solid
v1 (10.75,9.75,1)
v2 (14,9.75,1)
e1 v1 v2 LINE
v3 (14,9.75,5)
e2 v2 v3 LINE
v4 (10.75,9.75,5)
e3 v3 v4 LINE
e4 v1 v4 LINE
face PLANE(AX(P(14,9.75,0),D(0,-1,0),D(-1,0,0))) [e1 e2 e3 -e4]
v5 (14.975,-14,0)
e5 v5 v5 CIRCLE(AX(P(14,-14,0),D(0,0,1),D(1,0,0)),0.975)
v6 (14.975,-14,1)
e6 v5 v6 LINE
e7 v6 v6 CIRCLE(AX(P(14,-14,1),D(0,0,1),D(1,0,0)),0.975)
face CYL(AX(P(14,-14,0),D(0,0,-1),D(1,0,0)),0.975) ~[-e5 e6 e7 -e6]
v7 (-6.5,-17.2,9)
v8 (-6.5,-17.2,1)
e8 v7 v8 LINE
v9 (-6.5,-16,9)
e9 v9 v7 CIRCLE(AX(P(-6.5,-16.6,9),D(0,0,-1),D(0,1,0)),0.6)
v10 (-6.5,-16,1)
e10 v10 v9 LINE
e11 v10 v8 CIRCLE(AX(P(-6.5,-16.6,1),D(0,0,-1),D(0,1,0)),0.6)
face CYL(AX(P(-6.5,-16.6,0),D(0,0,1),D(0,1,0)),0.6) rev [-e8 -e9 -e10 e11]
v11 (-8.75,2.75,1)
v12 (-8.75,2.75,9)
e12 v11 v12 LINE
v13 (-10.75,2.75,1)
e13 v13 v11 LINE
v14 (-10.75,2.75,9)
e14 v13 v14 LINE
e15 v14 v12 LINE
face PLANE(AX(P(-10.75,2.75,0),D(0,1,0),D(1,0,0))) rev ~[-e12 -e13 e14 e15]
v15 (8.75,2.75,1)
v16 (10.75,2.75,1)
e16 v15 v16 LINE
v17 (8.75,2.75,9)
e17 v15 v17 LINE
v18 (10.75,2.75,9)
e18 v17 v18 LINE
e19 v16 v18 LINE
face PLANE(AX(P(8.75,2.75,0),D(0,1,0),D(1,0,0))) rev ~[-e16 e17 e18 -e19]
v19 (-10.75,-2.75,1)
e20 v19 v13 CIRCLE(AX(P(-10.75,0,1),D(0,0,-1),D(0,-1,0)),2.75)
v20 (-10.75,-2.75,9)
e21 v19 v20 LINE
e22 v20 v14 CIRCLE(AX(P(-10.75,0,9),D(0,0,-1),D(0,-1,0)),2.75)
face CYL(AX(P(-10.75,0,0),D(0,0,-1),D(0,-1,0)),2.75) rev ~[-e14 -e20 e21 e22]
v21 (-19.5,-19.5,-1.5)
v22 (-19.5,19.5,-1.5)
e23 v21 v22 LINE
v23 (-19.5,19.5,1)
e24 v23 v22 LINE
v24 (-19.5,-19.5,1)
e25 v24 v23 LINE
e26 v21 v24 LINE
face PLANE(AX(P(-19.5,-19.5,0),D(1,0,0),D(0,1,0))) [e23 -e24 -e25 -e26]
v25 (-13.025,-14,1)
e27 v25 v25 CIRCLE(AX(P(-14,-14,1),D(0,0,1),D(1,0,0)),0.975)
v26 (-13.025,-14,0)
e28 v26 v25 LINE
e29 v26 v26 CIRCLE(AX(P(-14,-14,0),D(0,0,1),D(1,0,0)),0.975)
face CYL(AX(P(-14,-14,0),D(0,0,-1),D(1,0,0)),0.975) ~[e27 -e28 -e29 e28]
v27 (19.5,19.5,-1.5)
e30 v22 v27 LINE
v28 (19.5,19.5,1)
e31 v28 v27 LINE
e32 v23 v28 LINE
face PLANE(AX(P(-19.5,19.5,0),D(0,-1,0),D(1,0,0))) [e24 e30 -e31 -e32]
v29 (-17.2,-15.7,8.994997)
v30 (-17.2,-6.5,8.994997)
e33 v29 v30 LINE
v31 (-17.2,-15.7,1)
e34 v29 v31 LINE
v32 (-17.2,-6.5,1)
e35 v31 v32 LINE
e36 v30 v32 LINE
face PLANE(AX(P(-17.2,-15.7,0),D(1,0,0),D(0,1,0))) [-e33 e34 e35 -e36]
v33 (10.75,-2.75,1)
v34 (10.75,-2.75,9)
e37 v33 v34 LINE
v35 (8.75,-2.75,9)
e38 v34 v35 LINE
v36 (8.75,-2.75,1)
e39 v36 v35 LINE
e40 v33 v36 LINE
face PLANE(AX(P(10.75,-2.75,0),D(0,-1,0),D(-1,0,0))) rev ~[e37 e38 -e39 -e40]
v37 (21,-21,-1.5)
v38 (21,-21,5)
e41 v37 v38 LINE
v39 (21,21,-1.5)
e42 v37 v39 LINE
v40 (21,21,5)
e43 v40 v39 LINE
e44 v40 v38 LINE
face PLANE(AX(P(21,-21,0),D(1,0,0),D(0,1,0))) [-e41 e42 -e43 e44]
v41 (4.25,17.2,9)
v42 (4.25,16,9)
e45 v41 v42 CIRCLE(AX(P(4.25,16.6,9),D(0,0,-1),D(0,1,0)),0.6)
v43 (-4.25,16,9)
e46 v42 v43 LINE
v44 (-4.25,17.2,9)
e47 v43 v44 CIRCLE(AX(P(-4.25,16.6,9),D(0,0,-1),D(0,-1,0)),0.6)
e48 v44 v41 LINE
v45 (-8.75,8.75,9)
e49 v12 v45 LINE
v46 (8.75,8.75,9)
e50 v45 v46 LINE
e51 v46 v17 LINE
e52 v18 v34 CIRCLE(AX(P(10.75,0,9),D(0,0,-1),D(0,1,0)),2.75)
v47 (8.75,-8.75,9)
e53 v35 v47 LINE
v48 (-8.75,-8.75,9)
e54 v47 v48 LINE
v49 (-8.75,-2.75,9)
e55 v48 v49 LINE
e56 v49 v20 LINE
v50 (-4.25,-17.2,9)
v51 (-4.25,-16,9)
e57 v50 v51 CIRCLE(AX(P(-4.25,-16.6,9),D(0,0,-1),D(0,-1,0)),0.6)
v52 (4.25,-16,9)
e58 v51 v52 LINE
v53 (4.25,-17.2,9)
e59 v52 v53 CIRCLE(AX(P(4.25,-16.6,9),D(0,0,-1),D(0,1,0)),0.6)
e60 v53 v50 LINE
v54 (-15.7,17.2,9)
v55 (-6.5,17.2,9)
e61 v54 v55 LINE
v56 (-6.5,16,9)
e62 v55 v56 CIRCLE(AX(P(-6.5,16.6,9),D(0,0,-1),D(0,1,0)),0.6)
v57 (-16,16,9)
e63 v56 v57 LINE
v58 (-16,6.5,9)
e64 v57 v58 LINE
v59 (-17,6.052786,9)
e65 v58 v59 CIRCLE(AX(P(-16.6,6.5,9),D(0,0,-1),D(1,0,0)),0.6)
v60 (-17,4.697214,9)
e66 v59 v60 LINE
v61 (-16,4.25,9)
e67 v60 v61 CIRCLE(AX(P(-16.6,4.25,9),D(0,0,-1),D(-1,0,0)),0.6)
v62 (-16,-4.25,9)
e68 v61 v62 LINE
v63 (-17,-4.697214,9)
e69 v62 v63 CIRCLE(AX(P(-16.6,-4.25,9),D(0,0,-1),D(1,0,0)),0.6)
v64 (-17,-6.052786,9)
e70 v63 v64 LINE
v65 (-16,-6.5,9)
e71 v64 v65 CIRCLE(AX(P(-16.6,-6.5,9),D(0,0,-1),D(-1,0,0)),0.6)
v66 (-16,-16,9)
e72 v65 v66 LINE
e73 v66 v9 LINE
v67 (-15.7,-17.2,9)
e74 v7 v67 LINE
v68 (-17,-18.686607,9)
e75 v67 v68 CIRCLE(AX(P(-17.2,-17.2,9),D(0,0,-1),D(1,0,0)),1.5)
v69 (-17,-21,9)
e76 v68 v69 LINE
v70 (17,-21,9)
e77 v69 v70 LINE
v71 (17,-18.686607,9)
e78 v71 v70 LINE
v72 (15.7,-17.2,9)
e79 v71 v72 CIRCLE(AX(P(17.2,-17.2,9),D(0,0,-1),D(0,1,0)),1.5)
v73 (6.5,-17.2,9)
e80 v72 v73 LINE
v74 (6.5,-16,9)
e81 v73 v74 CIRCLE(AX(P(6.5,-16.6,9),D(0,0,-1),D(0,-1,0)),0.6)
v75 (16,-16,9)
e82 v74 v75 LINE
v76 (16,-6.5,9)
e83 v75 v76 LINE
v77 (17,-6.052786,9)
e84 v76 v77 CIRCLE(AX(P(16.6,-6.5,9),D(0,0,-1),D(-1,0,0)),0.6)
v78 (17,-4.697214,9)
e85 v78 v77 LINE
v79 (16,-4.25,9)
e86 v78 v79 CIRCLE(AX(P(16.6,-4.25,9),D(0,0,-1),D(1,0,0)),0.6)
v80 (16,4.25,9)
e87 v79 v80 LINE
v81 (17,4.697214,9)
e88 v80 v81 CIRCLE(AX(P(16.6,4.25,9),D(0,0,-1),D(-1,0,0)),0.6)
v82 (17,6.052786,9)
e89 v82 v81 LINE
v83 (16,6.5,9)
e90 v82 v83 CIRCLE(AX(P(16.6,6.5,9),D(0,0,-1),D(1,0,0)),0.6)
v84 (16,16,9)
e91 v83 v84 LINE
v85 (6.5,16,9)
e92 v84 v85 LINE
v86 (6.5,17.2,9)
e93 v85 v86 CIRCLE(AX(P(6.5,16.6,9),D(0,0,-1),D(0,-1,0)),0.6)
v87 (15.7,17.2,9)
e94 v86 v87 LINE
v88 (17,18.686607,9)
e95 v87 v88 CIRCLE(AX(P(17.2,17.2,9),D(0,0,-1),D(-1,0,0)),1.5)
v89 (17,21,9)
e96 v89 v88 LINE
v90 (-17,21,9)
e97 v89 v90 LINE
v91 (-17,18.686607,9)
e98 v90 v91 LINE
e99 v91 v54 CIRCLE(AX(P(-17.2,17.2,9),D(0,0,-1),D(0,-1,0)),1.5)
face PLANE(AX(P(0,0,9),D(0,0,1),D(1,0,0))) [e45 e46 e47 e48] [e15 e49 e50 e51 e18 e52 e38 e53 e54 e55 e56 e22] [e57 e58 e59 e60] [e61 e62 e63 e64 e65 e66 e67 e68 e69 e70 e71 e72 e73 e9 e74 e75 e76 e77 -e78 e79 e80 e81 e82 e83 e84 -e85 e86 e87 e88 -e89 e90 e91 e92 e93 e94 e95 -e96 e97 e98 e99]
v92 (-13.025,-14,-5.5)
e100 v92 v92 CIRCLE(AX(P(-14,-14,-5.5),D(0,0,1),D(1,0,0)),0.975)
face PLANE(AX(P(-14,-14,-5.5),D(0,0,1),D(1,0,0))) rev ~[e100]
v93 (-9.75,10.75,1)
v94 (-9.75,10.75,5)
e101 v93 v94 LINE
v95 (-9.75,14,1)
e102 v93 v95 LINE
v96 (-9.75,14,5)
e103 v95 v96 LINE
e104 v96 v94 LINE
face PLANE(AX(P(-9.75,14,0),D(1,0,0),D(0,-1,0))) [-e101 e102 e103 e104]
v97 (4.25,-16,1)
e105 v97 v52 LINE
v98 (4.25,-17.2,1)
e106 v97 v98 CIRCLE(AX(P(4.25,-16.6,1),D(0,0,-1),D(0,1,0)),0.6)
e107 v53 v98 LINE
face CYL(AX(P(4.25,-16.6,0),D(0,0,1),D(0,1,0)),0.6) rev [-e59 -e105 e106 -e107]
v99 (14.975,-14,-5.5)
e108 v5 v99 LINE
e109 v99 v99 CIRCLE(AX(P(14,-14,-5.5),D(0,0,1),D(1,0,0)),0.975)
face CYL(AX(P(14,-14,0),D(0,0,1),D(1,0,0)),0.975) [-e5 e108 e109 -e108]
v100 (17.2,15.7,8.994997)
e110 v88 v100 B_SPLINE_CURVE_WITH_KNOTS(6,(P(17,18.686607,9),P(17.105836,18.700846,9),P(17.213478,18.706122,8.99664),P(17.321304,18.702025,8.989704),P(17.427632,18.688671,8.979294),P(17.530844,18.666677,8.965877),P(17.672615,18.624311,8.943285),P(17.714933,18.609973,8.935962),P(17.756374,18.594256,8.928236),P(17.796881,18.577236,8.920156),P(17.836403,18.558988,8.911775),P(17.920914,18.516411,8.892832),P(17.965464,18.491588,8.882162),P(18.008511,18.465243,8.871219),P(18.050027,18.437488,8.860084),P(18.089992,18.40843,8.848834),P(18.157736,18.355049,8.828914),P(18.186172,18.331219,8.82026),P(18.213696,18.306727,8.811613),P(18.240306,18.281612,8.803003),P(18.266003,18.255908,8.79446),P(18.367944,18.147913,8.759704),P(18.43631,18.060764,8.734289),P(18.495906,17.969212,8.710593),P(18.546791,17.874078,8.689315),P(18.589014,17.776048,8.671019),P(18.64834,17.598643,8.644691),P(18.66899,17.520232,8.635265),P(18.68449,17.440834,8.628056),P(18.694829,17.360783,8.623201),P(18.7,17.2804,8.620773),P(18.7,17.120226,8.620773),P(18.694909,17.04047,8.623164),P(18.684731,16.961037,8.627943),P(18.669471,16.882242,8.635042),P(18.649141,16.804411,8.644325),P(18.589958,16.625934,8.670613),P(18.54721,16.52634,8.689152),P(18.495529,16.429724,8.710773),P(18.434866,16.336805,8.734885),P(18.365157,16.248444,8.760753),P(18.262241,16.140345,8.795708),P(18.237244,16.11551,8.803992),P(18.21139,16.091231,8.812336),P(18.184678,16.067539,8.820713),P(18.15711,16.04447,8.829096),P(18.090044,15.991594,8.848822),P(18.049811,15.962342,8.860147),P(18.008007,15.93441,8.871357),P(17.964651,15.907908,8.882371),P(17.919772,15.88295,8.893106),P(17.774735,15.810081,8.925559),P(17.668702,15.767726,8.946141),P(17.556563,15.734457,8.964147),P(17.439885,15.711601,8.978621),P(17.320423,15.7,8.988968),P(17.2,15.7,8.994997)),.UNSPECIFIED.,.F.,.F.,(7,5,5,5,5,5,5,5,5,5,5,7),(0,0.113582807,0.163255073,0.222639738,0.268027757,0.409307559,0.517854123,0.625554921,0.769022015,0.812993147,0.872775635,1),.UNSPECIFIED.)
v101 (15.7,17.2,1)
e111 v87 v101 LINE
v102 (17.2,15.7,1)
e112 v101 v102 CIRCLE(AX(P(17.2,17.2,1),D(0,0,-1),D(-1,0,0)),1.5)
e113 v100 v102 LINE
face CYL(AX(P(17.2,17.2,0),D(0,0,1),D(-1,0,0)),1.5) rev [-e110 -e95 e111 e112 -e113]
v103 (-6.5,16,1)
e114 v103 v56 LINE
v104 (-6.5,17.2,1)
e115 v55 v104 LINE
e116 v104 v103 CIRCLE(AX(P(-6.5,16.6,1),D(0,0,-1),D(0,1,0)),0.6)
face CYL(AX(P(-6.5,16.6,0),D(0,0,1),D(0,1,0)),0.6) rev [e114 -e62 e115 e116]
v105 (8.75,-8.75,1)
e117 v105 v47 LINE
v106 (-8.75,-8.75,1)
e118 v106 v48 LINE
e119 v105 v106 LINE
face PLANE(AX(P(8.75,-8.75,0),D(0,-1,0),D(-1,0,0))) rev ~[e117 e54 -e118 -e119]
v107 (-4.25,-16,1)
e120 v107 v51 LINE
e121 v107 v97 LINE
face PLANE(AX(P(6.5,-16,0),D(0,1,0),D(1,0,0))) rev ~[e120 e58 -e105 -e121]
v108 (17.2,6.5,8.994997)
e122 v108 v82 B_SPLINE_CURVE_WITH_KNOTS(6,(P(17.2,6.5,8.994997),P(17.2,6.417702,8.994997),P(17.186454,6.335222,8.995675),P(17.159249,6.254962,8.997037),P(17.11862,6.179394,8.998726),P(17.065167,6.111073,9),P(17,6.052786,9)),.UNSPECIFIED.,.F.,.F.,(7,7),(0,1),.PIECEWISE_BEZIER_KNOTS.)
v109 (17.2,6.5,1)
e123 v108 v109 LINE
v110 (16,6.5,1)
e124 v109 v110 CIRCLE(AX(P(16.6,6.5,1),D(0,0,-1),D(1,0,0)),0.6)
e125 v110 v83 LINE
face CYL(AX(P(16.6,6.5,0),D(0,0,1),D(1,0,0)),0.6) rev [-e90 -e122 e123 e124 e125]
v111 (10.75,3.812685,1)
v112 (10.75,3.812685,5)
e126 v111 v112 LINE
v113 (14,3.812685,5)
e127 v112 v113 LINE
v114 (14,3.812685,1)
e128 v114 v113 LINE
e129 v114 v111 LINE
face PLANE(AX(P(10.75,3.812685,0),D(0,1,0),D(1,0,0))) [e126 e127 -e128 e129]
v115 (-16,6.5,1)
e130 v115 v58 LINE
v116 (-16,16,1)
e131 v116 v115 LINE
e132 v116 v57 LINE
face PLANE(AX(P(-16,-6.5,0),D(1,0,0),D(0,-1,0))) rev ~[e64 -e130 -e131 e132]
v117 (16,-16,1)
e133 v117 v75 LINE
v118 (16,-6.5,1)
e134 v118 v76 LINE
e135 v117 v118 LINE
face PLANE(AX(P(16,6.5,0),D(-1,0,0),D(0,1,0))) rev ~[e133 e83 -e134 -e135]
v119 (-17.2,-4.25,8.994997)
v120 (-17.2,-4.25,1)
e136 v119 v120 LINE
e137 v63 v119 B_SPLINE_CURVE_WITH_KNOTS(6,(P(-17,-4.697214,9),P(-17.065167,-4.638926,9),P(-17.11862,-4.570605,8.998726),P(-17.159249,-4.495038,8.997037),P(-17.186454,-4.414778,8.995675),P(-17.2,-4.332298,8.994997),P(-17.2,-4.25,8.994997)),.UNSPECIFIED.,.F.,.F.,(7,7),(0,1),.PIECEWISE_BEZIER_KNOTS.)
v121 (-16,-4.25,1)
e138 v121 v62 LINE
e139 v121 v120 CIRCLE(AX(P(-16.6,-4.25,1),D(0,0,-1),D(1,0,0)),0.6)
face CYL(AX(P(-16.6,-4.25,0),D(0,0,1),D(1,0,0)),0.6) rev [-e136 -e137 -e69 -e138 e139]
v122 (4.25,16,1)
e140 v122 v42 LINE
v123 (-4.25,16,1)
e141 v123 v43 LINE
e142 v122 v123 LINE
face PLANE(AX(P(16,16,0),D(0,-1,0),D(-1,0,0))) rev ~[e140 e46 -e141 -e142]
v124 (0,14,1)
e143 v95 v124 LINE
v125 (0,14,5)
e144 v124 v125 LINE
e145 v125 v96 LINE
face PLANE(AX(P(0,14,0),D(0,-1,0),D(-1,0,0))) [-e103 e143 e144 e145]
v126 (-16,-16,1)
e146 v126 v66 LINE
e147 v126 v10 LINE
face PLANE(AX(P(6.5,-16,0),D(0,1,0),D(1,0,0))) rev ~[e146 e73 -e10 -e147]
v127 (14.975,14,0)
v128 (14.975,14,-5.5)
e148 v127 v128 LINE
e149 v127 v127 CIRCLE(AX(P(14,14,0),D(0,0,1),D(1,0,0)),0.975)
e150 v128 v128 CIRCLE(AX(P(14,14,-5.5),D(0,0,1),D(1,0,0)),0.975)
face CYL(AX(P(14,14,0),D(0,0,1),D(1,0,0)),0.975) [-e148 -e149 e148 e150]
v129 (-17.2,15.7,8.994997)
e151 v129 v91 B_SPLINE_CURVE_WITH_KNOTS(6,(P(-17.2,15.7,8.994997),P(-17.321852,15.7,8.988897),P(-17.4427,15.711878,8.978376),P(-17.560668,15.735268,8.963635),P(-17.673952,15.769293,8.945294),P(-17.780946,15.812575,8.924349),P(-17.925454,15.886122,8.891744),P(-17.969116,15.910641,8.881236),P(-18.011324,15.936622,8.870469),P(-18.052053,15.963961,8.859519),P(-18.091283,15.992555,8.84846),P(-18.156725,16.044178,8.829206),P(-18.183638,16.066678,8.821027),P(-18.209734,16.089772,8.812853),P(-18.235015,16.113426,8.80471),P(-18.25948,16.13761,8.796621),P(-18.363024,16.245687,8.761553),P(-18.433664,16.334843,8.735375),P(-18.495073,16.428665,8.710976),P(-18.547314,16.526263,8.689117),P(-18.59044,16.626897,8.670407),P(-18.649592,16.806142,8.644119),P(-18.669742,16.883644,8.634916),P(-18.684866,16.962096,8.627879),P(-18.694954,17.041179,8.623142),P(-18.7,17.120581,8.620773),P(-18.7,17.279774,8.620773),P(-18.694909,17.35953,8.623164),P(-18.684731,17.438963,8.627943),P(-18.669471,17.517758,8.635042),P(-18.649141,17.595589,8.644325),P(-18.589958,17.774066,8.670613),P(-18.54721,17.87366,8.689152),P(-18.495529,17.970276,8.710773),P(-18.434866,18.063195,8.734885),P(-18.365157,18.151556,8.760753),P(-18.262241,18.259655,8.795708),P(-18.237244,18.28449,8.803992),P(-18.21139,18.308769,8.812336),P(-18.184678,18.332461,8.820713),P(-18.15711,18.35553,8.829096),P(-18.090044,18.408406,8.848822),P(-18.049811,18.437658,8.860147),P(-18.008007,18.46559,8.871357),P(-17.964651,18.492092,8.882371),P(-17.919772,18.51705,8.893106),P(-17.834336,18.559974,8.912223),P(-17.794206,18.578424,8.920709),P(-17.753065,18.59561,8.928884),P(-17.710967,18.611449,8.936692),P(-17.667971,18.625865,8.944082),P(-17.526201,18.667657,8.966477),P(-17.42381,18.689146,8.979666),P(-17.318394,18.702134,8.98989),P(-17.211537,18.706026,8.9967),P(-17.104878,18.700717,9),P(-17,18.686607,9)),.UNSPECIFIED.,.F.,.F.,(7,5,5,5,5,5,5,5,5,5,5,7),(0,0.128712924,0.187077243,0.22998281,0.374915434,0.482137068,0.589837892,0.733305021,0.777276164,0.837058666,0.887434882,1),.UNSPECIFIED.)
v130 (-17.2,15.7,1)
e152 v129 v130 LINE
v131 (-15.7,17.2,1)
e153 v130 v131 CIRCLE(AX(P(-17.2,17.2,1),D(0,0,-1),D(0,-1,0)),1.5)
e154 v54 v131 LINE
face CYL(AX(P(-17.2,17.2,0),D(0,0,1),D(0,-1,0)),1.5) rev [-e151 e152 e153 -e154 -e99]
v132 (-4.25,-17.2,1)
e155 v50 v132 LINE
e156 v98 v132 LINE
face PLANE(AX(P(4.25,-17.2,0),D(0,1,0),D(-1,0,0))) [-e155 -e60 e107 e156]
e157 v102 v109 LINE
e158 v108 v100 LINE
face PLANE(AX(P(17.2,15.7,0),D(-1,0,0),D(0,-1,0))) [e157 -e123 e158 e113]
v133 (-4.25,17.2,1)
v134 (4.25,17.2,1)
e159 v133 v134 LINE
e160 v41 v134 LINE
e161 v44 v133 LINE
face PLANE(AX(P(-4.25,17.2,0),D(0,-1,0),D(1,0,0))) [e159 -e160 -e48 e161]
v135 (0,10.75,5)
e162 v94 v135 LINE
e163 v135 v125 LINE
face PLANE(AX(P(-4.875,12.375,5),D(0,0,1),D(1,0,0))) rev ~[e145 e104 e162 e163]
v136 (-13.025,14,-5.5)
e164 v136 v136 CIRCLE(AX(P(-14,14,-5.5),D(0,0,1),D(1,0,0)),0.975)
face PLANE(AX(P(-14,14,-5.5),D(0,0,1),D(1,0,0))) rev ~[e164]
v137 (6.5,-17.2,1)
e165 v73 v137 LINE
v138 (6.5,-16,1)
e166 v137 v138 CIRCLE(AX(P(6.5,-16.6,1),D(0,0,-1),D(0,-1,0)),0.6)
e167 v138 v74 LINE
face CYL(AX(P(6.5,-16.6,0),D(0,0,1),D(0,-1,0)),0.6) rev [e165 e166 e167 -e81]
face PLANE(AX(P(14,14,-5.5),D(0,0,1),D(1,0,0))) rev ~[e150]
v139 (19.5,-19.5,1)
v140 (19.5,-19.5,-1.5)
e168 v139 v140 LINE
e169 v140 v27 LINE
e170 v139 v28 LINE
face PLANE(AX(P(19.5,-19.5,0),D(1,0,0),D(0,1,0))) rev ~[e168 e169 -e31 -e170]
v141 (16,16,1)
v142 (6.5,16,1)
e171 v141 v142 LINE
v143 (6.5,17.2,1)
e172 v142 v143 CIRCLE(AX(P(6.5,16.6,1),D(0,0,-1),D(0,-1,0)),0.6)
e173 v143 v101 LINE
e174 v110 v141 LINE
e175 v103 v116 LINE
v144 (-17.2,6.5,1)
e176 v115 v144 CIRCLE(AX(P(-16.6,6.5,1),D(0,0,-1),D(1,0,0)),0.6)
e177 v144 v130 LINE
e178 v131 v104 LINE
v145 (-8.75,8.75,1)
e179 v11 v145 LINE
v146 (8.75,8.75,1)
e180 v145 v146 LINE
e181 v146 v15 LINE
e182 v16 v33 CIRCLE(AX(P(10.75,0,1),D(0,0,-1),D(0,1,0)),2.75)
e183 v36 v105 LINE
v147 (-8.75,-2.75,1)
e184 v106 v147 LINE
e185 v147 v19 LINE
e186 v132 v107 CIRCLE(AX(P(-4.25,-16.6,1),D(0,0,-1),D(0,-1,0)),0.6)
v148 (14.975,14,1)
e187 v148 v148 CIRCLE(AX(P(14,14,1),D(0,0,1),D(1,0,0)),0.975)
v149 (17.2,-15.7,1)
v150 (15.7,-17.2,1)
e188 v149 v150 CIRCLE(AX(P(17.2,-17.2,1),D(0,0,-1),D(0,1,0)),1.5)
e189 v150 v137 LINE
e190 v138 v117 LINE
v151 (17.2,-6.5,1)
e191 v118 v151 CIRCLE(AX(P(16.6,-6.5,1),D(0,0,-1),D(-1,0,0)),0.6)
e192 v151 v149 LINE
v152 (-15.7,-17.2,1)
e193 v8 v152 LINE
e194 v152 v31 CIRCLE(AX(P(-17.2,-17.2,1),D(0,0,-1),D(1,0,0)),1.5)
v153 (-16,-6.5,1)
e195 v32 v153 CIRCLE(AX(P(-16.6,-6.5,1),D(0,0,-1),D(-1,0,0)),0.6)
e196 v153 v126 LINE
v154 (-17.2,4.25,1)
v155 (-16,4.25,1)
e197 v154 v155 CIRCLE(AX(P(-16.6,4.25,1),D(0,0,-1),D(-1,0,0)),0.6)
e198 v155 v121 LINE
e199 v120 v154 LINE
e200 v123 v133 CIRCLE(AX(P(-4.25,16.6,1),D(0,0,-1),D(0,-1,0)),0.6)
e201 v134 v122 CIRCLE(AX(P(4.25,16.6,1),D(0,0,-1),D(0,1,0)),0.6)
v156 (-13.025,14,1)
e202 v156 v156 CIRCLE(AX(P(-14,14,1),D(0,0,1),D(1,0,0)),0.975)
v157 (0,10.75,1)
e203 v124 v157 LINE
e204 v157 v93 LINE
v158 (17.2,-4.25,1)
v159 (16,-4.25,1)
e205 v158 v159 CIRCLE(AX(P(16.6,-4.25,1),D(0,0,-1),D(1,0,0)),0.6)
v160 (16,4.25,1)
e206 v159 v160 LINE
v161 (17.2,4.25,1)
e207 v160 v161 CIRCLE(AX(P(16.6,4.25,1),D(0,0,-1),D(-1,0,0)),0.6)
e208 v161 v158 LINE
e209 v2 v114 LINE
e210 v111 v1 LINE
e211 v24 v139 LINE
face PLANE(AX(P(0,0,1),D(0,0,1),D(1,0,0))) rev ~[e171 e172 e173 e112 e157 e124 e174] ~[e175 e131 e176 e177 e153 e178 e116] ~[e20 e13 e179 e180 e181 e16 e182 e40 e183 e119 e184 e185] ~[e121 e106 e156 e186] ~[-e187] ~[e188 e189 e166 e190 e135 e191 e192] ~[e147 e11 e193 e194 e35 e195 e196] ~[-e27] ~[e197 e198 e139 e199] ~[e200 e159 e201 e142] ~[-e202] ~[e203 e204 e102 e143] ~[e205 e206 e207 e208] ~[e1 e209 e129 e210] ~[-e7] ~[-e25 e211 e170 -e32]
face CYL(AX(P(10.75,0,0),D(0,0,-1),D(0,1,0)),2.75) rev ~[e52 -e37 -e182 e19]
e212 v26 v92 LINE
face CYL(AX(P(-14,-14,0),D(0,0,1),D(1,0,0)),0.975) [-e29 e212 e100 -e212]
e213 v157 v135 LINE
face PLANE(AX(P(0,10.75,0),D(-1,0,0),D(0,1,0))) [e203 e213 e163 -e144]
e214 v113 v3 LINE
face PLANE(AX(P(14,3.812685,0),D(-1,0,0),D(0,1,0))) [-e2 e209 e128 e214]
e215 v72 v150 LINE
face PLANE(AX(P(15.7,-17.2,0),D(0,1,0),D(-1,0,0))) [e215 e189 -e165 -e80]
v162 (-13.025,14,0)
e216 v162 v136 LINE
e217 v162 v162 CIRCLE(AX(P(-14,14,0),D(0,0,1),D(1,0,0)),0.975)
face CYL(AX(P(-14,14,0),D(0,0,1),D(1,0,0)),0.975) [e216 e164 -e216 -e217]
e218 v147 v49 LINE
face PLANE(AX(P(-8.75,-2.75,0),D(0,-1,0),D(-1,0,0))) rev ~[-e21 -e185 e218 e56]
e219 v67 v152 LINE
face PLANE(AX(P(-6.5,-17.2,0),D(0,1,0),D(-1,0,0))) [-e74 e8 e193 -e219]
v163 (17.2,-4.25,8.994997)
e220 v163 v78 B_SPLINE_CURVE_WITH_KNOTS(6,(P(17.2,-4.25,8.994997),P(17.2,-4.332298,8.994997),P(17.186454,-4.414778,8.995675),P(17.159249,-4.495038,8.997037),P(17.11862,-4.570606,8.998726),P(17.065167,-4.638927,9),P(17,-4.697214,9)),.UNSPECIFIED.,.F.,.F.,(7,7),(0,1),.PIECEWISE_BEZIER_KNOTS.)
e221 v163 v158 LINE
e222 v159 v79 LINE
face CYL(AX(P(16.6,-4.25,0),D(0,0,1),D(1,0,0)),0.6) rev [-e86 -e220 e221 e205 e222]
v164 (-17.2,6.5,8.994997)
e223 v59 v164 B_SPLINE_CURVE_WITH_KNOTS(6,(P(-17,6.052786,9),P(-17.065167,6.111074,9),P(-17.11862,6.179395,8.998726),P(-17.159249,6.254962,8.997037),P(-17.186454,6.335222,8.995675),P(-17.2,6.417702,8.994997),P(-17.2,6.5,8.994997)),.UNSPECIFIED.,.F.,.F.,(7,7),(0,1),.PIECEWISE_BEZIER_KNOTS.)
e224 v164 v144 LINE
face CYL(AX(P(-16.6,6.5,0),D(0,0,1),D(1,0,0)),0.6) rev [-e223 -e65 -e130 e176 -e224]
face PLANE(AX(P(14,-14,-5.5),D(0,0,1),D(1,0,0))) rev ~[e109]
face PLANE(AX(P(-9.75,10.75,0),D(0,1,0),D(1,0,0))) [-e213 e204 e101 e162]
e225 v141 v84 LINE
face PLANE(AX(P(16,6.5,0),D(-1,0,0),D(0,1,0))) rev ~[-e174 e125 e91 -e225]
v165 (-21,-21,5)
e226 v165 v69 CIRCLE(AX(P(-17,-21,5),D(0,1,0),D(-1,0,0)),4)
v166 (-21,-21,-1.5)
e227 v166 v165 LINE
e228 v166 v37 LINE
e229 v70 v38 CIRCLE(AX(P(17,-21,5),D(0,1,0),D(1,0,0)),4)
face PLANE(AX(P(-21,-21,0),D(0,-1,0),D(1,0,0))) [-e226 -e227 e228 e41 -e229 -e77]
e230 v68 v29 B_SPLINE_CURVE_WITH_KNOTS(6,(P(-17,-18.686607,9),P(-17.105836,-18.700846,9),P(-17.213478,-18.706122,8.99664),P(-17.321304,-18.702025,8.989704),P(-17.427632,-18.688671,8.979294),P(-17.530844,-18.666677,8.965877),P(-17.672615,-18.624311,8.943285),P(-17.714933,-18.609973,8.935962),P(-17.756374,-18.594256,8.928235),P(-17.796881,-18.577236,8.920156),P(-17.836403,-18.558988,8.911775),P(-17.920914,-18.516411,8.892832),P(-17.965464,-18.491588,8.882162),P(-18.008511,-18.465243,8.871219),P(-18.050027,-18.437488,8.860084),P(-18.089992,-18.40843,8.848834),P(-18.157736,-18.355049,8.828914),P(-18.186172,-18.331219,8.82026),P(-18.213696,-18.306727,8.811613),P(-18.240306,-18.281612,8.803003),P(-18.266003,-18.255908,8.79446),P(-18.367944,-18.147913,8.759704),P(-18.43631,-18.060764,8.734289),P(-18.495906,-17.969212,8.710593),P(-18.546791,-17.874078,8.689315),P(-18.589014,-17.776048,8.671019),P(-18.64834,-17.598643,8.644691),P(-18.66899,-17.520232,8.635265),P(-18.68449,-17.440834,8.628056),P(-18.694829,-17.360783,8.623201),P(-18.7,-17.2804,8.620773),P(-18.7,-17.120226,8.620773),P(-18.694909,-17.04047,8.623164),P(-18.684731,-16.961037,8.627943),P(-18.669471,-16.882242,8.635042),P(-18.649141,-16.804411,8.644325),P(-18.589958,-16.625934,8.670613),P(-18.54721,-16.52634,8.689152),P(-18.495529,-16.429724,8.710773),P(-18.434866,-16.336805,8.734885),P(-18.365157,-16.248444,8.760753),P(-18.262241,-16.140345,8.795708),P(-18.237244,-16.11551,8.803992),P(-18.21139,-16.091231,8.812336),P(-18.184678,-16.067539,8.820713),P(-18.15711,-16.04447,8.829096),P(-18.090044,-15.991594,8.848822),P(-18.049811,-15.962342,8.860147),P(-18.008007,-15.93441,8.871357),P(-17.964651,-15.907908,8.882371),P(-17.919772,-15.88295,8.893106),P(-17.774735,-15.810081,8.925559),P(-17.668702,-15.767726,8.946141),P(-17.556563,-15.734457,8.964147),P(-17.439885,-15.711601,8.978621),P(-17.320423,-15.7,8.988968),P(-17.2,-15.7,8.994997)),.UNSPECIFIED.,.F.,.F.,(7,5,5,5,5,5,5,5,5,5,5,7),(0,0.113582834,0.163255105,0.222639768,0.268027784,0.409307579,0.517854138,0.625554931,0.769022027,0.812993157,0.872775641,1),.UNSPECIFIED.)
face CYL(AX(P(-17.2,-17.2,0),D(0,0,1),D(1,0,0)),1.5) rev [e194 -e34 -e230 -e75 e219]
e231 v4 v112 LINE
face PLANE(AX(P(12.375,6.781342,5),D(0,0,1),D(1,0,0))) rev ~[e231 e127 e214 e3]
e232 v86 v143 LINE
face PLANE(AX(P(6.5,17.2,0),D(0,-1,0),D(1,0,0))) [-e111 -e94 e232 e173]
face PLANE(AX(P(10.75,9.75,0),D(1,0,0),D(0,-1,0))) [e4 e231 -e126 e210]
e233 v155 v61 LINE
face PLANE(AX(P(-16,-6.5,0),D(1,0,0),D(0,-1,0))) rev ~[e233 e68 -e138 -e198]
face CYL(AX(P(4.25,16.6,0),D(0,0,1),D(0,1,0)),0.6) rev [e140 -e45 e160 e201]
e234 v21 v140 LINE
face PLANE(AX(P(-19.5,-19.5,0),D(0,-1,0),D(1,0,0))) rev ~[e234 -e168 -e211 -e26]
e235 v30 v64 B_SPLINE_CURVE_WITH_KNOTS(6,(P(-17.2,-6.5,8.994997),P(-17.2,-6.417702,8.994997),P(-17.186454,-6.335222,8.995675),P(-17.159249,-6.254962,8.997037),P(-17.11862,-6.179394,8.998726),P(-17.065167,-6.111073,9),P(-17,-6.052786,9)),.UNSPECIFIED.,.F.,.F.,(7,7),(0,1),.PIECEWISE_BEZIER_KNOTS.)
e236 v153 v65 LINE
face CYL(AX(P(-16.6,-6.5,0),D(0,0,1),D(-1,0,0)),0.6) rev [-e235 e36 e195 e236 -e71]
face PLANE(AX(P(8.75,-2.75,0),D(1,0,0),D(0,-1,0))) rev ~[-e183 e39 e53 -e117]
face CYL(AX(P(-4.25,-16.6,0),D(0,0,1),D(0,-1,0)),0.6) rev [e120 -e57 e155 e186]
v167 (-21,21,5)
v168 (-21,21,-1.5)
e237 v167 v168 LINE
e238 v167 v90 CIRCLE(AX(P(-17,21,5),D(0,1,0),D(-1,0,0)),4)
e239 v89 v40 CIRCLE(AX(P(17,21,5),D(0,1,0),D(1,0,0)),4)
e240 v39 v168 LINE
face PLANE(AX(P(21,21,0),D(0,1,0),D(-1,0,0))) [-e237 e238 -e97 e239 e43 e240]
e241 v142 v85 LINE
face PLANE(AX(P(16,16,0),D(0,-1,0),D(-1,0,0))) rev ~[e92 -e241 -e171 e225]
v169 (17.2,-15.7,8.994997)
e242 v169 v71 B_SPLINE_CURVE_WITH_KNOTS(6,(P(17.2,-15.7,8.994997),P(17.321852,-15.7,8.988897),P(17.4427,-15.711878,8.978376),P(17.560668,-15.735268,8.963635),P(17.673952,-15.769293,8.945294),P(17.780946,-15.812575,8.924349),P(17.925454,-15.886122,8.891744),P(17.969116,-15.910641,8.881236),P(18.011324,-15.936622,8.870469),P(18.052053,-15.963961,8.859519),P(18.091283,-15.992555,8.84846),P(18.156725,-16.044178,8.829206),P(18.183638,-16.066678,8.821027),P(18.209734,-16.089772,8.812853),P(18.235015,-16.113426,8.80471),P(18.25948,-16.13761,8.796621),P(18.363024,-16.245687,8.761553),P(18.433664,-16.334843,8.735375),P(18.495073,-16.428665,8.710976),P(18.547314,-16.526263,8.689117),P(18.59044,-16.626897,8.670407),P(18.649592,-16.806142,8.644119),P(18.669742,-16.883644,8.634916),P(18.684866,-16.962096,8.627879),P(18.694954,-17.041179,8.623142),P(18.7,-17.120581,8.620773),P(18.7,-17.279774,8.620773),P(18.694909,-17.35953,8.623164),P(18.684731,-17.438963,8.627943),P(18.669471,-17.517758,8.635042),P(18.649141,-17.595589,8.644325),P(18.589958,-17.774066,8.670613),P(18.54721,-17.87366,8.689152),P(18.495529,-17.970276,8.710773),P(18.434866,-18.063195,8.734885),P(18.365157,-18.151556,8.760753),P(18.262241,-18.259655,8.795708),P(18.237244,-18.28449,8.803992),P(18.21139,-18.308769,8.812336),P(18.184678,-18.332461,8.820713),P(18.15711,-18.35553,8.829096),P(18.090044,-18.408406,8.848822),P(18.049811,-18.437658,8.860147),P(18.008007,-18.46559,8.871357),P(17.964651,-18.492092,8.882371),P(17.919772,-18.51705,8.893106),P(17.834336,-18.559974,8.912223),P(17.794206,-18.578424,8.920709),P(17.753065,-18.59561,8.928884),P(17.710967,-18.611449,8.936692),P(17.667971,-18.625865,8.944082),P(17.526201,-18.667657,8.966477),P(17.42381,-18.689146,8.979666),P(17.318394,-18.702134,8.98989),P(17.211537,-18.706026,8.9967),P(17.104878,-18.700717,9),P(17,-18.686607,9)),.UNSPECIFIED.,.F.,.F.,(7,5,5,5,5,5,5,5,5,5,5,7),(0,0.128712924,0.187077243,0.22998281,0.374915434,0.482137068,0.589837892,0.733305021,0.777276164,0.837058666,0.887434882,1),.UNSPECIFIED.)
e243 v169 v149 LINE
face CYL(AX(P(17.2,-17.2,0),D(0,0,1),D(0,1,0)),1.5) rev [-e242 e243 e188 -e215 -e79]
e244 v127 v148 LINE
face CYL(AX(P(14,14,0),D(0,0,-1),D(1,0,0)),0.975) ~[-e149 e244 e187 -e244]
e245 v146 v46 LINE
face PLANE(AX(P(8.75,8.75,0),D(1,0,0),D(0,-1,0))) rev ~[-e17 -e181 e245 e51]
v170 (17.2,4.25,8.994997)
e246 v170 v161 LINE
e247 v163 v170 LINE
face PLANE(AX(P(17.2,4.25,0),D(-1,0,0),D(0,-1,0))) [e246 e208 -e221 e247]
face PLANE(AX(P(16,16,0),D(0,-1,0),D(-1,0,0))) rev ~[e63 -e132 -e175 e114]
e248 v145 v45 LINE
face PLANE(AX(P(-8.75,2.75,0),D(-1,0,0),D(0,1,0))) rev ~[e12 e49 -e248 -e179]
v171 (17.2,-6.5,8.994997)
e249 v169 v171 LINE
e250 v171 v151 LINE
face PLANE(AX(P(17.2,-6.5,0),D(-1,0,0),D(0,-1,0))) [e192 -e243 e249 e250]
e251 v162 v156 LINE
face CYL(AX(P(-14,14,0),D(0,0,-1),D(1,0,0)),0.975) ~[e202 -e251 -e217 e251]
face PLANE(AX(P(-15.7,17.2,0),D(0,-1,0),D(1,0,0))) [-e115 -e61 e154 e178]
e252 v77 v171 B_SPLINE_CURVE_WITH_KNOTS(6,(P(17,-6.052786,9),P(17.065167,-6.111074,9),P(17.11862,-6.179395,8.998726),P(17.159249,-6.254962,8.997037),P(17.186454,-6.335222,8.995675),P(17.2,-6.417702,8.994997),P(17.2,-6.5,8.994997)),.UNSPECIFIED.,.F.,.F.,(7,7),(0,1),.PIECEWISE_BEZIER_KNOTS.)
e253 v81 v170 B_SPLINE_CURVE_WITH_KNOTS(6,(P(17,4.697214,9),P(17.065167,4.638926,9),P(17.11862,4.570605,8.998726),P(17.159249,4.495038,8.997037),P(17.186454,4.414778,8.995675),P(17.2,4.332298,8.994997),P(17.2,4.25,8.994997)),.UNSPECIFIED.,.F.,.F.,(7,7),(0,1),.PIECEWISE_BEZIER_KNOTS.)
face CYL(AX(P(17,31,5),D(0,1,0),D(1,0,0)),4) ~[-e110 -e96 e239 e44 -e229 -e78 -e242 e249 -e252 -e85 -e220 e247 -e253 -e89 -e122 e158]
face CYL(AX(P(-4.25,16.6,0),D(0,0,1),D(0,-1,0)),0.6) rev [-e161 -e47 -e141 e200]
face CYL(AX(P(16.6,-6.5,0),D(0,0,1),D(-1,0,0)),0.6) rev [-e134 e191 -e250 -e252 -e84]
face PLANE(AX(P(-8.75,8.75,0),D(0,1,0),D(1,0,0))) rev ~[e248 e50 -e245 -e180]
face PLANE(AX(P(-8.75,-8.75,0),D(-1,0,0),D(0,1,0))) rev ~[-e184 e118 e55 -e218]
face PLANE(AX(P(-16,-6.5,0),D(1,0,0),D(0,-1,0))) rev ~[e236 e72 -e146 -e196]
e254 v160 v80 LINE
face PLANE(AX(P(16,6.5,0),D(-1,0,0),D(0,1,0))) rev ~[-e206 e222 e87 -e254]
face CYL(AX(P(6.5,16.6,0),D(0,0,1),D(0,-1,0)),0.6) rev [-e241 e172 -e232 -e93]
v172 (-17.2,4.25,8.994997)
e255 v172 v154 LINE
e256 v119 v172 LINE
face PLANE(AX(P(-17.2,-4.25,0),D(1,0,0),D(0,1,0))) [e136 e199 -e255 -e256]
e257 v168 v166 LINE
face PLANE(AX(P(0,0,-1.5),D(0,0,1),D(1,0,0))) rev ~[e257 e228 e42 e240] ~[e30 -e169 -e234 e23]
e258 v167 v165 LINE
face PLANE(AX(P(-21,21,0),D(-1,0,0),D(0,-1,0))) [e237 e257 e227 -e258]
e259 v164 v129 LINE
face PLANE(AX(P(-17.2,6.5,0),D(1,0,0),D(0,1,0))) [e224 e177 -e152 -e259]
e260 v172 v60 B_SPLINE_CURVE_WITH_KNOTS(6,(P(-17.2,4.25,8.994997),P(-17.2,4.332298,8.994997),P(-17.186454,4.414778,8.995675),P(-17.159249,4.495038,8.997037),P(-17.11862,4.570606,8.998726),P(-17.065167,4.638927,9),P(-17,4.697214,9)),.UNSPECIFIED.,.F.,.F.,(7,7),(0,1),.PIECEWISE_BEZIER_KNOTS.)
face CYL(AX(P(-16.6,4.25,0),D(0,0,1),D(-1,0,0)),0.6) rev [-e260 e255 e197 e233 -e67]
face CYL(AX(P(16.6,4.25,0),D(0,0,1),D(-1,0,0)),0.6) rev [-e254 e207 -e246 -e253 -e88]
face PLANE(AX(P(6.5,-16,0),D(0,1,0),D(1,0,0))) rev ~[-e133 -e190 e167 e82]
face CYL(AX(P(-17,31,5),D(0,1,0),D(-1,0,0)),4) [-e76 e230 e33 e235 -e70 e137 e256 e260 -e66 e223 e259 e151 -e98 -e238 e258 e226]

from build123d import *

# Parameters (mm, degrees)
F0_W        = 39
F0_H        = 39
F0_R        = 0.975
F1_DEPTH    = 9
F2_T1_DEPTH = 62
F3_DEPTH    = 5.5
F4_DEPTH    = 1.5
F5_DEPTH    = 2.5
F6_DEPTH    = 1.5
F7_DEPTH    = 5
F8_DEPTH    = 1


# Not quite as in the source:
# - a fillet or chamfer that OpenCascade refuses, or shapes differently, is made with other operations: its cross-section is extruded or revolved along the edge and cut away or added


with BuildPart() as f1:
    # F0 (on Top) → F1 (new body)
    with BuildSketch(Plane.XY):
        Polygon((-2.625, 21), (-21, 21), (-21, -21), (-2.625, -21), (2.625, -21), (21, -21), (21, 21), (2.625, 21), align=None)
        Rectangle(F0_W, F0_H, mode=Mode.SUBTRACT)
        Rectangle(F0_W, F0_H)
        with BuildLine():
            ThreePointArc((16, 4.25), (16.6, 4.85), (17.2, 4.25))
            Line((17.2, 4.25), (17.2, -4.25))
            ThreePointArc((17.2, -4.25), (16.6, -4.85), (16, -4.25))
            Line((16, -4.25), (16, -6.5))
            ThreePointArc((16, -6.5), (16.6, -5.9), (17.2, -6.5))
            Line((17.2, -6.5), (17.2, -15.7))
            ThreePointArc((17.2, -15.7), (18.2606601718, -18.2606601718), (15.7, -17.2))
            Line((15.7, -17.2), (6.5, -17.2))
            ThreePointArc((6.5, -17.2), (5.9, -16.6), (6.5, -16))
            Line((6.5, -16), (4.25, -16))
            ThreePointArc((4.25, -16), (4.85, -16.6), (4.25, -17.2))
            Line((4.25, -17.2), (-4.25, -17.2))
            ThreePointArc((-4.25, -17.2), (-4.85, -16.6), (-4.25, -16))
            Line((-4.25, -16), (-6.5, -16))
            ThreePointArc((-6.5, -16), (-5.9, -16.6), (-6.5, -17.2))
            Line((-6.5, -17.2), (-15.7, -17.2))
            ThreePointArc((-15.7, -17.2), (-18.2606601718, -18.2606601718), (-17.2, -15.7))
            Line((-17.2, -15.7), (-17.2, -6.5))
            ThreePointArc((-17.2, -6.5), (-16.6, -5.9), (-16, -6.5))
            Line((-16, -6.5), (-16, -4.25))
            ThreePointArc((-16, -4.25), (-16.6, -4.85), (-17.2, -4.25))
            Line((-17.2, -4.25), (-17.2, 4.25))
            ThreePointArc((-17.2, 4.25), (-16.6, 4.85), (-16, 4.25))
            Line((-16, 4.25), (-16, 6.5))
            ThreePointArc((-16, 6.5), (-16.6, 5.9), (-17.2, 6.5))
            Line((-17.2, 6.5), (-17.2, 15.7))
            ThreePointArc((-17.2, 15.7), (-18.2606601718, 18.2606601718), (-15.7, 17.2))
            Line((-15.7, 17.2), (-6.5, 17.2))
            ThreePointArc((-6.5, 17.2), (-5.9, 16.6), (-6.5, 16))
            Line((-6.5, 16), (-4.25, 16))
            ThreePointArc((-4.25, 16), (-4.85, 16.6), (-4.25, 17.2))
            Line((-4.25, 17.2), (4.25, 17.2))
            ThreePointArc((4.25, 17.2), (4.85, 16.6), (4.25, 16))
            Line((4.25, 16), (6.5, 16))
            ThreePointArc((6.5, 16), (5.9, 16.6), (6.5, 17.2))
            Line((6.5, 17.2), (15.7, 17.2))
            ThreePointArc((15.7, 17.2), (18.2606601718, 18.2606601718), (17.2, 15.7))
            Line((17.2, 15.7), (17.2, 6.5))
            ThreePointArc((17.2, 6.5), (16.6, 5.9), (16, 6.5))
            Line((16, 6.5), (16, 4.25))
        make_face(mode=Mode.SUBTRACT)
        Polygon((16, -4.25), (16, 4.25), (16, 6.5), (16, 16), (6.5, 16), (4.25, 16), (-4.25, 16), (-6.5, 16), (-16, 16), (-16, 6.5), (-16, 4.25), (-16, -4.25), (-16, -6.5), (-16, -16), (-6.5, -16), (-4.25, -16), (4.25, -16), (6.5, -16), (16, -16), (16, -6.5), align=None)
        with Locations((-14, -14)):
            Circle(F0_R, mode=Mode.SUBTRACT)
        with Locations((14, -14)):
            Circle(F0_R, mode=Mode.SUBTRACT)
        with Locations((-14, 14)):
            Circle(F0_R, mode=Mode.SUBTRACT)
        Polygon((-8.75, 14), (0, 14), (0, 10.75), (-8.75, 10.75), (-9.75, 10.75), (-9.75, 14), align=None, mode=Mode.SUBTRACT)
        with BuildLine():
            Line((-8.75, 8.75), (8.75, 8.75))
            Line((8.75, 8.75), (8.75, 2.75))
            Line((8.75, 2.75), (10.75, 2.75))
            ThreePointArc((10.75, 2.75), (13.5, 0), (10.75, -2.75))
            Line((10.75, -2.75), (8.75, -2.75))
            Line((8.75, -2.75), (8.75, -8.75))
            Line((8.75, -8.75), (-8.75, -8.75))
            Line((-8.75, -8.75), (-8.75, -2.75))
            Line((-8.75, -2.75), (-10.75, -2.75))
            ThreePointArc((-10.75, -2.75), (-13.5, 0), (-10.75, 2.75))
            Line((-10.75, 2.75), (-8.75, 2.75))
            Line((-8.75, 2.75), (-8.75, 8.75))
        make_face(mode=Mode.SUBTRACT)
        Polygon((10.75, 3.8126846775), (10.75, 8.75), (10.75, 9.75), (14, 9.75), (14, 8.75), (14, 3.8126846775), align=None, mode=Mode.SUBTRACT)
        with Locations((14, 14)):
            Circle(F0_R, mode=Mode.SUBTRACT)
        Polygon((0, 10.75), (0, 14), (-8.75, 14), (-9.75, 14), (-9.75, 10.75), (-8.75, 10.75), align=None)
        Polygon((10.75, 9.75), (10.75, 8.75), (10.75, 3.8126846775), (14, 3.8126846775), (14, 8.75), (14, 9.75), align=None)
        with Locations((14, -14)):
            Circle(F0_R)
        with Locations((-14, -14)):
            Circle(F0_R)
        with Locations((-14, 14)):
            Circle(F0_R)
        with Locations((14, 14)):
            Circle(F0_R)
    extrude(amount=F1_DEPTH)

    # F2: fillet of radius 4 on 2 edges, made by hand

    # F2_s2 → F2_t1 (cut)
    with BuildSketch(Plane.XZ.offset(-31)):
        with BuildLine():
            ThreePointArc((-21, 5), (-19.8284271247, 7.8284271247), (-17, 9))
            Line((-17, 9), (-21, 9))
            Line((-21, 9), (-21, 5))
        make_face()
        with BuildLine():
            ThreePointArc((21, 5), (19.8284271247, 7.8284271247), (17, 9))
            Line((17, 9), (21, 9))
            Line((21, 9), (21, 5))
        make_face()
    extrude(amount=F2_T1_DEPTH, mode=Mode.SUBTRACT)

    # F0 (on Top) → F3 (join)
    with BuildSketch(Plane.XY):
        with Locations((-14, -14)):
            Circle(F0_R)
        with Locations((14, -14)):
            Circle(F0_R)
        with Locations((-14, 14)):
            Circle(F0_R)
        with Locations((14, 14)):
            Circle(F0_R)
    extrude(amount=-F3_DEPTH)

    # F0 (on Top) → F4 (join)
    with BuildSketch(Plane.XY):
        Rectangle(F0_W, F0_H)
        with BuildLine():
            ThreePointArc((16, 4.25), (16.6, 4.85), (17.2, 4.25))
            Line((17.2, 4.25), (17.2, -4.25))
            ThreePointArc((17.2, -4.25), (16.6, -4.85), (16, -4.25))
            Line((16, -4.25), (16, -6.5))
            ThreePointArc((16, -6.5), (16.6, -5.9), (17.2, -6.5))
            Line((17.2, -6.5), (17.2, -15.7))
            ThreePointArc((17.2, -15.7), (18.2606601718, -18.2606601718), (15.7, -17.2))
            Line((15.7, -17.2), (6.5, -17.2))
            ThreePointArc((6.5, -17.2), (5.9, -16.6), (6.5, -16))
            Line((6.5, -16), (4.25, -16))
            ThreePointArc((4.25, -16), (4.85, -16.6), (4.25, -17.2))
            Line((4.25, -17.2), (-4.25, -17.2))
            ThreePointArc((-4.25, -17.2), (-4.85, -16.6), (-4.25, -16))
            Line((-4.25, -16), (-6.5, -16))
            ThreePointArc((-6.5, -16), (-5.9, -16.6), (-6.5, -17.2))
            Line((-6.5, -17.2), (-15.7, -17.2))
            ThreePointArc((-15.7, -17.2), (-18.2606601718, -18.2606601718), (-17.2, -15.7))
            Line((-17.2, -15.7), (-17.2, -6.5))
            ThreePointArc((-17.2, -6.5), (-16.6, -5.9), (-16, -6.5))
            Line((-16, -6.5), (-16, -4.25))
            ThreePointArc((-16, -4.25), (-16.6, -4.85), (-17.2, -4.25))
            Line((-17.2, -4.25), (-17.2, 4.25))
            ThreePointArc((-17.2, 4.25), (-16.6, 4.85), (-16, 4.25))
            Line((-16, 4.25), (-16, 6.5))
            ThreePointArc((-16, 6.5), (-16.6, 5.9), (-17.2, 6.5))
            Line((-17.2, 6.5), (-17.2, 15.7))
            ThreePointArc((-17.2, 15.7), (-18.2606601718, 18.2606601718), (-15.7, 17.2))
            Line((-15.7, 17.2), (-6.5, 17.2))
            ThreePointArc((-6.5, 17.2), (-5.9, 16.6), (-6.5, 16))
            Line((-6.5, 16), (-4.25, 16))
            ThreePointArc((-4.25, 16), (-4.85, 16.6), (-4.25, 17.2))
            Line((-4.25, 17.2), (4.25, 17.2))
            ThreePointArc((4.25, 17.2), (4.85, 16.6), (4.25, 16))
            Line((4.25, 16), (6.5, 16))
            ThreePointArc((6.5, 16), (5.9, 16.6), (6.5, 17.2))
            Line((6.5, 17.2), (15.7, 17.2))
            ThreePointArc((15.7, 17.2), (18.2606601718, 18.2606601718), (17.2, 15.7))
            Line((17.2, 15.7), (17.2, 6.5))
            ThreePointArc((17.2, 6.5), (16.6, 5.9), (16, 6.5))
            Line((16, 6.5), (16, 4.25))
        make_face(mode=Mode.SUBTRACT)
    extrude(amount=-F4_DEPTH)

    # F5 (cut): a face of the model
    f5_faces = [f1.faces().sort_by_distance(p)[0] for p in [
        (-18.9484567107, 0, -1.5),
    ]]
    extrude(f5_faces, amount=-F5_DEPTH, mode=Mode.SUBTRACT)

    # F0 (on Top) → F6 (join)
    with BuildSketch(Plane.XY):
        Polygon((-2.625, 21), (-21, 21), (-21, -21), (-2.625, -21), (2.625, -21), (21, -21), (21, 21), (2.625, 21), align=None)
        Rectangle(F0_W, F0_H, mode=Mode.SUBTRACT)
    extrude(amount=-F6_DEPTH)

    # F0 (on Top) → F7 (cut)
    with BuildSketch(Plane.XY):
        Polygon((10.75, 9.75), (10.75, 8.75), (10.75, 3.8126846775), (14, 3.8126846775), (14, 8.75), (14, 9.75), align=None)
        Polygon((0, 10.75), (0, 14), (-8.75, 14), (-9.75, 14), (-9.75, 10.75), (-8.75, 10.75), align=None)
    extrude(amount=F7_DEPTH, mode=Mode.SUBTRACT)

    # F0 (on Top) → F8 (cut)
    with BuildSketch(Plane.XY):
        Polygon((16, -4.25), (16, 4.25), (16, 6.5), (16, 16), (6.5, 16), (4.25, 16), (-4.25, 16), (-6.5, 16), (-16, 16), (-16, 6.5), (-16, 4.25), (-16, -4.25), (-16, -6.5), (-16, -16), (-6.5, -16), (-4.25, -16), (4.25, -16), (6.5, -16), (16, -16), (16, -6.5), align=None)
        with Locations((-14, -14)):
            Circle(F0_R, mode=Mode.SUBTRACT)
        with Locations((14, -14)):
            Circle(F0_R, mode=Mode.SUBTRACT)
        with Locations((-14, 14)):
            Circle(F0_R, mode=Mode.SUBTRACT)
        Polygon((-8.75, 14), (0, 14), (0, 10.75), (-8.75, 10.75), (-9.75, 10.75), (-9.75, 14), align=None, mode=Mode.SUBTRACT)
        with BuildLine():
            Line((-8.75, 8.75), (8.75, 8.75))
            Line((8.75, 8.75), (8.75, 2.75))
            Line((8.75, 2.75), (10.75, 2.75))
            ThreePointArc((10.75, 2.75), (13.5, 0), (10.75, -2.75))
            Line((10.75, -2.75), (8.75, -2.75))
            Line((8.75, -2.75), (8.75, -8.75))
            Line((8.75, -8.75), (-8.75, -8.75))
            Line((-8.75, -8.75), (-8.75, -2.75))
            Line((-8.75, -2.75), (-10.75, -2.75))
            ThreePointArc((-10.75, -2.75), (-13.5, 0), (-10.75, 2.75))
            Line((-10.75, 2.75), (-8.75, 2.75))
            Line((-8.75, 2.75), (-8.75, 8.75))
        make_face(mode=Mode.SUBTRACT)
        Polygon((10.75, 3.8126846775), (10.75, 8.75), (10.75, 9.75), (14, 9.75), (14, 8.75), (14, 3.8126846775), align=None, mode=Mode.SUBTRACT)
        with Locations((14, 14)):
            Circle(F0_R, mode=Mode.SUBTRACT)
    extrude(amount=F8_DEPTH, mode=Mode.SUBTRACT)


solid = f1.part
